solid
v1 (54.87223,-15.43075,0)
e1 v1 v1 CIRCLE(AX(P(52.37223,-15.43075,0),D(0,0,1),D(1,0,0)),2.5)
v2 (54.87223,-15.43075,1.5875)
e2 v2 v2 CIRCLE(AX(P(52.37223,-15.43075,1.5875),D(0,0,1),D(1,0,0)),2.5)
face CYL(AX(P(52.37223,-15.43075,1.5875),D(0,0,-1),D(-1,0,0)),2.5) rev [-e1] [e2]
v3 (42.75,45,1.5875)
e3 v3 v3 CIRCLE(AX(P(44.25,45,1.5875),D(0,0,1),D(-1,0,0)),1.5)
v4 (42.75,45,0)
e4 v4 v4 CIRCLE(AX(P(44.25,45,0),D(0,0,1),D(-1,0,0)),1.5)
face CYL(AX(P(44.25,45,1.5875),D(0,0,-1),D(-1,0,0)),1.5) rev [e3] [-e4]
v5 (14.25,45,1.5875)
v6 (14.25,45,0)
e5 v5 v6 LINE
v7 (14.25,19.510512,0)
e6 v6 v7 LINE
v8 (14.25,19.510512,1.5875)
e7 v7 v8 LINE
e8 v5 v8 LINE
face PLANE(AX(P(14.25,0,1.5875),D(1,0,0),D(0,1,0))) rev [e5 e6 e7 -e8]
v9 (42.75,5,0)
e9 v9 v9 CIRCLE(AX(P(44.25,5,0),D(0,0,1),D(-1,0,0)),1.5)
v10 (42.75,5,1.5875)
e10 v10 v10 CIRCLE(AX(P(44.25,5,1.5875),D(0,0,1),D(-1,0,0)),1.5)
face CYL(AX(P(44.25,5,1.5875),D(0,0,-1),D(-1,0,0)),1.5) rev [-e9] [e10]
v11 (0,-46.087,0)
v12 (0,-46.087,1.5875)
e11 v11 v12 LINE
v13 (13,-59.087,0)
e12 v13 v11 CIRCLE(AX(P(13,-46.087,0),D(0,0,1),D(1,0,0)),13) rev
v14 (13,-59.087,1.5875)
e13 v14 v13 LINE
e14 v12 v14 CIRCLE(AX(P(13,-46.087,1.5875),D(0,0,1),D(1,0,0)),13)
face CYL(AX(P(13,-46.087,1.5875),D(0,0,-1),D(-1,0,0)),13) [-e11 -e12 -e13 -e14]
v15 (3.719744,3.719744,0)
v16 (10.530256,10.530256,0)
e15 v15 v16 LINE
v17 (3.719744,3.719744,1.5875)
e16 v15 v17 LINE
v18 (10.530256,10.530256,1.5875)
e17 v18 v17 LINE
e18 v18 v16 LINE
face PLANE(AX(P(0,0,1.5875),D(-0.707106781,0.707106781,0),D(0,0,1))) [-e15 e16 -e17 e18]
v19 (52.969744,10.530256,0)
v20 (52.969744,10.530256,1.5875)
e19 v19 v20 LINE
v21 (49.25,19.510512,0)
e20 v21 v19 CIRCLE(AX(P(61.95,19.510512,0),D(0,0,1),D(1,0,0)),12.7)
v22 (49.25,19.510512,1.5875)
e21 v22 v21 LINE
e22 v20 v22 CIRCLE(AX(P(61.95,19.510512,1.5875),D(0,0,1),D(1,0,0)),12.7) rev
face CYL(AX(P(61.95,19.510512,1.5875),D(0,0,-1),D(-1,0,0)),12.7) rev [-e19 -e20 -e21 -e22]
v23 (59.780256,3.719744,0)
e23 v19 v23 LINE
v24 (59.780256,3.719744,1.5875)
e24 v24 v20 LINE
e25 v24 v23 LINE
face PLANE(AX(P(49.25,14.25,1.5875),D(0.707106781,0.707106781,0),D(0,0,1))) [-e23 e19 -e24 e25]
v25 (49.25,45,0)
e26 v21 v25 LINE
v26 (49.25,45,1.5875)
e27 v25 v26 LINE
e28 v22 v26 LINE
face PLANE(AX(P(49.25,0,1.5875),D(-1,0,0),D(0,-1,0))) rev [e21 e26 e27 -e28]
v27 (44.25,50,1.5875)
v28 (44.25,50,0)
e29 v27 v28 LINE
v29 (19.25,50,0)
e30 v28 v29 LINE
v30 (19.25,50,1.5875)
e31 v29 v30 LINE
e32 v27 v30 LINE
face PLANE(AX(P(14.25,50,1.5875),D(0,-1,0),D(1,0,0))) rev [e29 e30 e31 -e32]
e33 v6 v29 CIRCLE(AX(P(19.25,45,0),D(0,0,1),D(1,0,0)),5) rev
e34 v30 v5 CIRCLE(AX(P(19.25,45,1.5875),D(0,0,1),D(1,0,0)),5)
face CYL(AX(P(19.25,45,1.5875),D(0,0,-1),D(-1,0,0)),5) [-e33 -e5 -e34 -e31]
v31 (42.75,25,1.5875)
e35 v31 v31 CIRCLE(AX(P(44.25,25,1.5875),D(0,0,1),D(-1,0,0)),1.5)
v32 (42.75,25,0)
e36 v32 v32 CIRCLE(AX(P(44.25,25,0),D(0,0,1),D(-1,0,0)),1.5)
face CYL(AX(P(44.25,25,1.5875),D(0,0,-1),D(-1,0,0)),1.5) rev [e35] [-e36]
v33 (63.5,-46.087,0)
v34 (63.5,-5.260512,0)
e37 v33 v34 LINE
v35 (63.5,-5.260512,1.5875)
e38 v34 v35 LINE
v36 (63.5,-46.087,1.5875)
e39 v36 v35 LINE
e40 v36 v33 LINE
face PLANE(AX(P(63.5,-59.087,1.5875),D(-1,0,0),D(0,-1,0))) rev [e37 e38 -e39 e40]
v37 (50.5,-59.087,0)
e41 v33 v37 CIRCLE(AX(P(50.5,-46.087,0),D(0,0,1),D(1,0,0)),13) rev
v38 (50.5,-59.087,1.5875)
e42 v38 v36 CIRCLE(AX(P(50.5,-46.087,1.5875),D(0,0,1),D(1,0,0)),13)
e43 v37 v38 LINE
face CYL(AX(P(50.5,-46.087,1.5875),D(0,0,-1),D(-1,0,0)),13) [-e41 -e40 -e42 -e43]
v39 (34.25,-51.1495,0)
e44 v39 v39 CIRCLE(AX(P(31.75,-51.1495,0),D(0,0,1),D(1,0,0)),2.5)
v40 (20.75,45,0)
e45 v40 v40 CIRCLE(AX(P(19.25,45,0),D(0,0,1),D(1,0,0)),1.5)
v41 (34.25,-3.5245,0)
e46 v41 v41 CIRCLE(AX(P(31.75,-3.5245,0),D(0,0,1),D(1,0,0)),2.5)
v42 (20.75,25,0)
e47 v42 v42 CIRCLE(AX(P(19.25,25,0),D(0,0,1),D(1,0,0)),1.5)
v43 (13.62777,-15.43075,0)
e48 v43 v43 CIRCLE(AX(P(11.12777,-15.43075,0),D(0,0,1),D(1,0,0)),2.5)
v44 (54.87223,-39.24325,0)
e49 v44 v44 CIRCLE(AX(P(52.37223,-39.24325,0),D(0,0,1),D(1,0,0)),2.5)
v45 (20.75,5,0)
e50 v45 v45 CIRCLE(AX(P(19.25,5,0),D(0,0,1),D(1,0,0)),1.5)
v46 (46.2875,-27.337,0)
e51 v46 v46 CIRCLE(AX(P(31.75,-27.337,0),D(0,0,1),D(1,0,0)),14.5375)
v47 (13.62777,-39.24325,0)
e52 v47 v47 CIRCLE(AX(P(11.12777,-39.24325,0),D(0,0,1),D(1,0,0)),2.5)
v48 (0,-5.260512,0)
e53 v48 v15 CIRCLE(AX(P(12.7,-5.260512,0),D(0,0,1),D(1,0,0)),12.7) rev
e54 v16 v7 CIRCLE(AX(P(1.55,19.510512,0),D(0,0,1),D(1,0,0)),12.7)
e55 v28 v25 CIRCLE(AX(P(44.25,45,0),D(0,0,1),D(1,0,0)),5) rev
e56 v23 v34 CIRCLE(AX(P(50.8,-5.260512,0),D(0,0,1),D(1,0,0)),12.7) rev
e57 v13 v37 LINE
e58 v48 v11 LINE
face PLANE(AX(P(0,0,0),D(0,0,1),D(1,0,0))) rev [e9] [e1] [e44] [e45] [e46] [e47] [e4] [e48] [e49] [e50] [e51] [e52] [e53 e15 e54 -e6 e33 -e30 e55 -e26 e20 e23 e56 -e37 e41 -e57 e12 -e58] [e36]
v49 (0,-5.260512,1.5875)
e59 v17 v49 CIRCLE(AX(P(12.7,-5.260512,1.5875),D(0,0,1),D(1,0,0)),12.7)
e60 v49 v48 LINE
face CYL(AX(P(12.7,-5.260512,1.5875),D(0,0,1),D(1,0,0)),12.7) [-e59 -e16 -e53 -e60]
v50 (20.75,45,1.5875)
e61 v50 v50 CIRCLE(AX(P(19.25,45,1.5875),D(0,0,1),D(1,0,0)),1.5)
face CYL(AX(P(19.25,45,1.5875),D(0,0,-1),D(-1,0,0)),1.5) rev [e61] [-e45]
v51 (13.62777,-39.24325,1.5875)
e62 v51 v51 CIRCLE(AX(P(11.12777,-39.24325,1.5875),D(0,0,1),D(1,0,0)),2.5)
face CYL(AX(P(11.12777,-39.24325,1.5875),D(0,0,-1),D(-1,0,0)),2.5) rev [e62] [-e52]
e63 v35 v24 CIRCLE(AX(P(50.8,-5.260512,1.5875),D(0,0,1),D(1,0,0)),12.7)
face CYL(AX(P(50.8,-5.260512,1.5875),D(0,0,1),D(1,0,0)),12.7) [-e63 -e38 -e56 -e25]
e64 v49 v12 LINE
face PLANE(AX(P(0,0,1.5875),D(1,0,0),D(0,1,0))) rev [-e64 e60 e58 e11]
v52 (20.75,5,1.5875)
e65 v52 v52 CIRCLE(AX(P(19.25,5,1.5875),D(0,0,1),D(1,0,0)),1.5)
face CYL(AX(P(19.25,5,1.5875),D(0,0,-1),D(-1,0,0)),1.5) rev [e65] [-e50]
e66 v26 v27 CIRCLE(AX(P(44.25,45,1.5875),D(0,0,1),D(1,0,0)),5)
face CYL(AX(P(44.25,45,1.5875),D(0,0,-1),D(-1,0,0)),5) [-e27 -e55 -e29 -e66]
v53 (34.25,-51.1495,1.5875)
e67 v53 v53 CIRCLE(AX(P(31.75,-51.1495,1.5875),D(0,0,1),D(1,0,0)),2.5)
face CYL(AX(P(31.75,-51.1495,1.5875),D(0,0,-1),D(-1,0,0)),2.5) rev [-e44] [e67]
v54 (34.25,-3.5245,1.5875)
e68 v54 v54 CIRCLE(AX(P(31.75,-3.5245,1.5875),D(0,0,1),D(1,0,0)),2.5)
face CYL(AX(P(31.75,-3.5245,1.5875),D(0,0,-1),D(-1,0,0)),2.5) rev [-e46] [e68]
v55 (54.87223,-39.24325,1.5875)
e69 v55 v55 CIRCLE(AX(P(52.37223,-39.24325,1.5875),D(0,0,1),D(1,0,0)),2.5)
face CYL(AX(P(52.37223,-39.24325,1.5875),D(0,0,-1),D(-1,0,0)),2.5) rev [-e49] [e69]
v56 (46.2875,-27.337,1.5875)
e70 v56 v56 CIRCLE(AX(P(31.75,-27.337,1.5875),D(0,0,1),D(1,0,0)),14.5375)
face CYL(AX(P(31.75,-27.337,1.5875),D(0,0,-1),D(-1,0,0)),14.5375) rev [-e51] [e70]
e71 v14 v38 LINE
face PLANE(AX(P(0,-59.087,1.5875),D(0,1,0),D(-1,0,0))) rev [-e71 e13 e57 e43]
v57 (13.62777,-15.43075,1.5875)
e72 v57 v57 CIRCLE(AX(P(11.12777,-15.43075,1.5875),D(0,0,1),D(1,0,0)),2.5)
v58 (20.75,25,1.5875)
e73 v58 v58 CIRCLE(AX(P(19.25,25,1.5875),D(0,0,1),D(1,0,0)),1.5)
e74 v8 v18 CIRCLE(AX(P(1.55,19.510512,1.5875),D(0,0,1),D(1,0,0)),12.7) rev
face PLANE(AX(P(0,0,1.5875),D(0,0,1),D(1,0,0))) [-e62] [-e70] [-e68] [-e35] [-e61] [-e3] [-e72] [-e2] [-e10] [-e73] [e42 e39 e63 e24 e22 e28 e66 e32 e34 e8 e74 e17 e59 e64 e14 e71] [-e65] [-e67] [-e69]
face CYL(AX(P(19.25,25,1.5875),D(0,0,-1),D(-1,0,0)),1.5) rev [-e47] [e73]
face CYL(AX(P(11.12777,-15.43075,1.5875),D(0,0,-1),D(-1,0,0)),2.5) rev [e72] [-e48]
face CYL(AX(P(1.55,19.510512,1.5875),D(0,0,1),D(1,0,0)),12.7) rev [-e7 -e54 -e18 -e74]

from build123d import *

# Parameters (mm, degrees)
SKETCH1_R           = 14.5375
SKETCH1_R_2         = 1.5
SKETCH1_R_3         = 2.5
BOSS_EXTRUDE1_DEPTH = 1.5875
FILLET1_R           = 5
FILLET2_R           = 13
CHAMFER1_SIZE       = 14.249999948
FILLET4_START       = -1
FILLET4_DEPTH       = 4
FILLET4_2_DEPTH     = 1.5875


with BuildPart() as part:
    # Sketch1 → Boss-Extrude1 (new body)
    with BuildSketch(Plane.XY):
        Polygon((14.25, 50), (49.25, 50), (49.25, 0), (63.5, 0), (63.5, -59.087), (0, -59.087), (0, 0), (14.25, 0), align=None)
        with Locations((31.75, -27.337)):
            Circle(SKETCH1_R, mode=Mode.SUBTRACT)
        with Locations((19.25, 45)):
            Circle(SKETCH1_R_2, mode=Mode.SUBTRACT)
        with Locations((19.25, 25)):
            Circle(SKETCH1_R_2, mode=Mode.SUBTRACT)
        with Locations((19.25, 5)):
            Circle(SKETCH1_R_2, mode=Mode.SUBTRACT)
        with Locations(Location((44.25, 5, 0), (0, 0, 180))):
            Circle(SKETCH1_R_2, mode=Mode.SUBTRACT)
        with Locations(Location((44.25, 25, 0), (0, 0, 180))):
            Circle(SKETCH1_R_2, mode=Mode.SUBTRACT)
        with Locations(Location((44.25, 45, 0), (0, 0, 180))):
            Circle(SKETCH1_R_2, mode=Mode.SUBTRACT)
        with Locations((31.75, -51.1495)):
            Circle(SKETCH1_R_3, mode=Mode.SUBTRACT)
        with Locations((11.127770072, -39.24325)):
            Circle(SKETCH1_R_3, mode=Mode.SUBTRACT)
        with Locations((11.127770072, -15.43075)):
            Circle(SKETCH1_R_3, mode=Mode.SUBTRACT)
        with Locations((31.75, -3.5245)):
            Circle(SKETCH1_R_3, mode=Mode.SUBTRACT)
        with Locations((52.372229928, -15.43075)):
            Circle(SKETCH1_R_3, mode=Mode.SUBTRACT)
        with Locations((52.372229928, -39.24325)):
            Circle(SKETCH1_R_3, mode=Mode.SUBTRACT)
    extrude(amount=BOSS_EXTRUDE1_DEPTH)

    # Fillet1
    fillet1_edges = [part.edges().sort_by_distance(p)[0] for p in [
        (14.25, 50, 0.79375),
        (49.25, 50, 0.79375),
    ]]
    fillet(fillet1_edges, radius=FILLET1_R)

    # Fillet2
    fillet2_edges = [part.edges().sort_by_distance(p)[0] for p in [
        (63.5, -59.087, 0.79375),
        (0, -59.087, 0.79375),
    ]]
    fillet(fillet2_edges, radius=FILLET2_R)

    # Chamfer1
    chamfer1_edges = [part.edges().sort_by_distance(p)[0] for p in [
        (49.25, 0, 0.79375),
        (14.25, 0, 0.79375),
    ]]
    chamfer(chamfer1_edges, length=CHAMFER1_SIZE)

    # Fillet4: read off the stored shape, not the designer's step
    # Fillet4 outline → Fillet4 (cut)
    with BuildSketch(Plane.XY.offset(FILLET4_START)):
        with BuildLine():
            ThreePointArc((0, -5.260512294), (0.966729937, -0.400432703), (3.719743879, 3.719743827))
            Line((3.719743879, 3.719743827), (2.6e-08, -2.6e-08))
            Line((2.6e-08, -2.6e-08), (0, -5.260512294))
        make_face()
        with BuildLine():
            Line((63.499999974, -2.6e-08), (59.780256121, 3.719743827))
            ThreePointArc((59.780256121, 3.719743827), (62.533270063, -0.400432703), (63.5, -5.260512294))
            Line((63.5, -5.260512294), (63.499999974, -2.6e-08))
        make_face()
    extrude(amount=FILLET4_DEPTH, mode=Mode.SUBTRACT)

    # Fillet4 2 outline → Fillet4 2 (add)
    with BuildSketch(Plane.XY):
        with BuildLine():
            ThreePointArc((14.25, 19.51051219), (13.283270063, 14.650432599), (10.530256121, 10.530256069))
            Line((10.530256121, 10.530256069), (14.25, 14.249999948))
            Line((14.25, 14.249999948), (14.25, 19.51051219))
        make_face()
        with BuildLine():
            Line((49.25, 14.249999948), (52.969743879, 10.530256069))
            ThreePointArc((52.969743879, 10.530256069), (50.216729937, 14.650432599), (49.25, 19.51051219))
            Line((49.25, 19.51051219), (49.25, 14.249999948))
        make_face()
    extrude(amount=FILLET4_2_DEPTH)


solid = part.part
